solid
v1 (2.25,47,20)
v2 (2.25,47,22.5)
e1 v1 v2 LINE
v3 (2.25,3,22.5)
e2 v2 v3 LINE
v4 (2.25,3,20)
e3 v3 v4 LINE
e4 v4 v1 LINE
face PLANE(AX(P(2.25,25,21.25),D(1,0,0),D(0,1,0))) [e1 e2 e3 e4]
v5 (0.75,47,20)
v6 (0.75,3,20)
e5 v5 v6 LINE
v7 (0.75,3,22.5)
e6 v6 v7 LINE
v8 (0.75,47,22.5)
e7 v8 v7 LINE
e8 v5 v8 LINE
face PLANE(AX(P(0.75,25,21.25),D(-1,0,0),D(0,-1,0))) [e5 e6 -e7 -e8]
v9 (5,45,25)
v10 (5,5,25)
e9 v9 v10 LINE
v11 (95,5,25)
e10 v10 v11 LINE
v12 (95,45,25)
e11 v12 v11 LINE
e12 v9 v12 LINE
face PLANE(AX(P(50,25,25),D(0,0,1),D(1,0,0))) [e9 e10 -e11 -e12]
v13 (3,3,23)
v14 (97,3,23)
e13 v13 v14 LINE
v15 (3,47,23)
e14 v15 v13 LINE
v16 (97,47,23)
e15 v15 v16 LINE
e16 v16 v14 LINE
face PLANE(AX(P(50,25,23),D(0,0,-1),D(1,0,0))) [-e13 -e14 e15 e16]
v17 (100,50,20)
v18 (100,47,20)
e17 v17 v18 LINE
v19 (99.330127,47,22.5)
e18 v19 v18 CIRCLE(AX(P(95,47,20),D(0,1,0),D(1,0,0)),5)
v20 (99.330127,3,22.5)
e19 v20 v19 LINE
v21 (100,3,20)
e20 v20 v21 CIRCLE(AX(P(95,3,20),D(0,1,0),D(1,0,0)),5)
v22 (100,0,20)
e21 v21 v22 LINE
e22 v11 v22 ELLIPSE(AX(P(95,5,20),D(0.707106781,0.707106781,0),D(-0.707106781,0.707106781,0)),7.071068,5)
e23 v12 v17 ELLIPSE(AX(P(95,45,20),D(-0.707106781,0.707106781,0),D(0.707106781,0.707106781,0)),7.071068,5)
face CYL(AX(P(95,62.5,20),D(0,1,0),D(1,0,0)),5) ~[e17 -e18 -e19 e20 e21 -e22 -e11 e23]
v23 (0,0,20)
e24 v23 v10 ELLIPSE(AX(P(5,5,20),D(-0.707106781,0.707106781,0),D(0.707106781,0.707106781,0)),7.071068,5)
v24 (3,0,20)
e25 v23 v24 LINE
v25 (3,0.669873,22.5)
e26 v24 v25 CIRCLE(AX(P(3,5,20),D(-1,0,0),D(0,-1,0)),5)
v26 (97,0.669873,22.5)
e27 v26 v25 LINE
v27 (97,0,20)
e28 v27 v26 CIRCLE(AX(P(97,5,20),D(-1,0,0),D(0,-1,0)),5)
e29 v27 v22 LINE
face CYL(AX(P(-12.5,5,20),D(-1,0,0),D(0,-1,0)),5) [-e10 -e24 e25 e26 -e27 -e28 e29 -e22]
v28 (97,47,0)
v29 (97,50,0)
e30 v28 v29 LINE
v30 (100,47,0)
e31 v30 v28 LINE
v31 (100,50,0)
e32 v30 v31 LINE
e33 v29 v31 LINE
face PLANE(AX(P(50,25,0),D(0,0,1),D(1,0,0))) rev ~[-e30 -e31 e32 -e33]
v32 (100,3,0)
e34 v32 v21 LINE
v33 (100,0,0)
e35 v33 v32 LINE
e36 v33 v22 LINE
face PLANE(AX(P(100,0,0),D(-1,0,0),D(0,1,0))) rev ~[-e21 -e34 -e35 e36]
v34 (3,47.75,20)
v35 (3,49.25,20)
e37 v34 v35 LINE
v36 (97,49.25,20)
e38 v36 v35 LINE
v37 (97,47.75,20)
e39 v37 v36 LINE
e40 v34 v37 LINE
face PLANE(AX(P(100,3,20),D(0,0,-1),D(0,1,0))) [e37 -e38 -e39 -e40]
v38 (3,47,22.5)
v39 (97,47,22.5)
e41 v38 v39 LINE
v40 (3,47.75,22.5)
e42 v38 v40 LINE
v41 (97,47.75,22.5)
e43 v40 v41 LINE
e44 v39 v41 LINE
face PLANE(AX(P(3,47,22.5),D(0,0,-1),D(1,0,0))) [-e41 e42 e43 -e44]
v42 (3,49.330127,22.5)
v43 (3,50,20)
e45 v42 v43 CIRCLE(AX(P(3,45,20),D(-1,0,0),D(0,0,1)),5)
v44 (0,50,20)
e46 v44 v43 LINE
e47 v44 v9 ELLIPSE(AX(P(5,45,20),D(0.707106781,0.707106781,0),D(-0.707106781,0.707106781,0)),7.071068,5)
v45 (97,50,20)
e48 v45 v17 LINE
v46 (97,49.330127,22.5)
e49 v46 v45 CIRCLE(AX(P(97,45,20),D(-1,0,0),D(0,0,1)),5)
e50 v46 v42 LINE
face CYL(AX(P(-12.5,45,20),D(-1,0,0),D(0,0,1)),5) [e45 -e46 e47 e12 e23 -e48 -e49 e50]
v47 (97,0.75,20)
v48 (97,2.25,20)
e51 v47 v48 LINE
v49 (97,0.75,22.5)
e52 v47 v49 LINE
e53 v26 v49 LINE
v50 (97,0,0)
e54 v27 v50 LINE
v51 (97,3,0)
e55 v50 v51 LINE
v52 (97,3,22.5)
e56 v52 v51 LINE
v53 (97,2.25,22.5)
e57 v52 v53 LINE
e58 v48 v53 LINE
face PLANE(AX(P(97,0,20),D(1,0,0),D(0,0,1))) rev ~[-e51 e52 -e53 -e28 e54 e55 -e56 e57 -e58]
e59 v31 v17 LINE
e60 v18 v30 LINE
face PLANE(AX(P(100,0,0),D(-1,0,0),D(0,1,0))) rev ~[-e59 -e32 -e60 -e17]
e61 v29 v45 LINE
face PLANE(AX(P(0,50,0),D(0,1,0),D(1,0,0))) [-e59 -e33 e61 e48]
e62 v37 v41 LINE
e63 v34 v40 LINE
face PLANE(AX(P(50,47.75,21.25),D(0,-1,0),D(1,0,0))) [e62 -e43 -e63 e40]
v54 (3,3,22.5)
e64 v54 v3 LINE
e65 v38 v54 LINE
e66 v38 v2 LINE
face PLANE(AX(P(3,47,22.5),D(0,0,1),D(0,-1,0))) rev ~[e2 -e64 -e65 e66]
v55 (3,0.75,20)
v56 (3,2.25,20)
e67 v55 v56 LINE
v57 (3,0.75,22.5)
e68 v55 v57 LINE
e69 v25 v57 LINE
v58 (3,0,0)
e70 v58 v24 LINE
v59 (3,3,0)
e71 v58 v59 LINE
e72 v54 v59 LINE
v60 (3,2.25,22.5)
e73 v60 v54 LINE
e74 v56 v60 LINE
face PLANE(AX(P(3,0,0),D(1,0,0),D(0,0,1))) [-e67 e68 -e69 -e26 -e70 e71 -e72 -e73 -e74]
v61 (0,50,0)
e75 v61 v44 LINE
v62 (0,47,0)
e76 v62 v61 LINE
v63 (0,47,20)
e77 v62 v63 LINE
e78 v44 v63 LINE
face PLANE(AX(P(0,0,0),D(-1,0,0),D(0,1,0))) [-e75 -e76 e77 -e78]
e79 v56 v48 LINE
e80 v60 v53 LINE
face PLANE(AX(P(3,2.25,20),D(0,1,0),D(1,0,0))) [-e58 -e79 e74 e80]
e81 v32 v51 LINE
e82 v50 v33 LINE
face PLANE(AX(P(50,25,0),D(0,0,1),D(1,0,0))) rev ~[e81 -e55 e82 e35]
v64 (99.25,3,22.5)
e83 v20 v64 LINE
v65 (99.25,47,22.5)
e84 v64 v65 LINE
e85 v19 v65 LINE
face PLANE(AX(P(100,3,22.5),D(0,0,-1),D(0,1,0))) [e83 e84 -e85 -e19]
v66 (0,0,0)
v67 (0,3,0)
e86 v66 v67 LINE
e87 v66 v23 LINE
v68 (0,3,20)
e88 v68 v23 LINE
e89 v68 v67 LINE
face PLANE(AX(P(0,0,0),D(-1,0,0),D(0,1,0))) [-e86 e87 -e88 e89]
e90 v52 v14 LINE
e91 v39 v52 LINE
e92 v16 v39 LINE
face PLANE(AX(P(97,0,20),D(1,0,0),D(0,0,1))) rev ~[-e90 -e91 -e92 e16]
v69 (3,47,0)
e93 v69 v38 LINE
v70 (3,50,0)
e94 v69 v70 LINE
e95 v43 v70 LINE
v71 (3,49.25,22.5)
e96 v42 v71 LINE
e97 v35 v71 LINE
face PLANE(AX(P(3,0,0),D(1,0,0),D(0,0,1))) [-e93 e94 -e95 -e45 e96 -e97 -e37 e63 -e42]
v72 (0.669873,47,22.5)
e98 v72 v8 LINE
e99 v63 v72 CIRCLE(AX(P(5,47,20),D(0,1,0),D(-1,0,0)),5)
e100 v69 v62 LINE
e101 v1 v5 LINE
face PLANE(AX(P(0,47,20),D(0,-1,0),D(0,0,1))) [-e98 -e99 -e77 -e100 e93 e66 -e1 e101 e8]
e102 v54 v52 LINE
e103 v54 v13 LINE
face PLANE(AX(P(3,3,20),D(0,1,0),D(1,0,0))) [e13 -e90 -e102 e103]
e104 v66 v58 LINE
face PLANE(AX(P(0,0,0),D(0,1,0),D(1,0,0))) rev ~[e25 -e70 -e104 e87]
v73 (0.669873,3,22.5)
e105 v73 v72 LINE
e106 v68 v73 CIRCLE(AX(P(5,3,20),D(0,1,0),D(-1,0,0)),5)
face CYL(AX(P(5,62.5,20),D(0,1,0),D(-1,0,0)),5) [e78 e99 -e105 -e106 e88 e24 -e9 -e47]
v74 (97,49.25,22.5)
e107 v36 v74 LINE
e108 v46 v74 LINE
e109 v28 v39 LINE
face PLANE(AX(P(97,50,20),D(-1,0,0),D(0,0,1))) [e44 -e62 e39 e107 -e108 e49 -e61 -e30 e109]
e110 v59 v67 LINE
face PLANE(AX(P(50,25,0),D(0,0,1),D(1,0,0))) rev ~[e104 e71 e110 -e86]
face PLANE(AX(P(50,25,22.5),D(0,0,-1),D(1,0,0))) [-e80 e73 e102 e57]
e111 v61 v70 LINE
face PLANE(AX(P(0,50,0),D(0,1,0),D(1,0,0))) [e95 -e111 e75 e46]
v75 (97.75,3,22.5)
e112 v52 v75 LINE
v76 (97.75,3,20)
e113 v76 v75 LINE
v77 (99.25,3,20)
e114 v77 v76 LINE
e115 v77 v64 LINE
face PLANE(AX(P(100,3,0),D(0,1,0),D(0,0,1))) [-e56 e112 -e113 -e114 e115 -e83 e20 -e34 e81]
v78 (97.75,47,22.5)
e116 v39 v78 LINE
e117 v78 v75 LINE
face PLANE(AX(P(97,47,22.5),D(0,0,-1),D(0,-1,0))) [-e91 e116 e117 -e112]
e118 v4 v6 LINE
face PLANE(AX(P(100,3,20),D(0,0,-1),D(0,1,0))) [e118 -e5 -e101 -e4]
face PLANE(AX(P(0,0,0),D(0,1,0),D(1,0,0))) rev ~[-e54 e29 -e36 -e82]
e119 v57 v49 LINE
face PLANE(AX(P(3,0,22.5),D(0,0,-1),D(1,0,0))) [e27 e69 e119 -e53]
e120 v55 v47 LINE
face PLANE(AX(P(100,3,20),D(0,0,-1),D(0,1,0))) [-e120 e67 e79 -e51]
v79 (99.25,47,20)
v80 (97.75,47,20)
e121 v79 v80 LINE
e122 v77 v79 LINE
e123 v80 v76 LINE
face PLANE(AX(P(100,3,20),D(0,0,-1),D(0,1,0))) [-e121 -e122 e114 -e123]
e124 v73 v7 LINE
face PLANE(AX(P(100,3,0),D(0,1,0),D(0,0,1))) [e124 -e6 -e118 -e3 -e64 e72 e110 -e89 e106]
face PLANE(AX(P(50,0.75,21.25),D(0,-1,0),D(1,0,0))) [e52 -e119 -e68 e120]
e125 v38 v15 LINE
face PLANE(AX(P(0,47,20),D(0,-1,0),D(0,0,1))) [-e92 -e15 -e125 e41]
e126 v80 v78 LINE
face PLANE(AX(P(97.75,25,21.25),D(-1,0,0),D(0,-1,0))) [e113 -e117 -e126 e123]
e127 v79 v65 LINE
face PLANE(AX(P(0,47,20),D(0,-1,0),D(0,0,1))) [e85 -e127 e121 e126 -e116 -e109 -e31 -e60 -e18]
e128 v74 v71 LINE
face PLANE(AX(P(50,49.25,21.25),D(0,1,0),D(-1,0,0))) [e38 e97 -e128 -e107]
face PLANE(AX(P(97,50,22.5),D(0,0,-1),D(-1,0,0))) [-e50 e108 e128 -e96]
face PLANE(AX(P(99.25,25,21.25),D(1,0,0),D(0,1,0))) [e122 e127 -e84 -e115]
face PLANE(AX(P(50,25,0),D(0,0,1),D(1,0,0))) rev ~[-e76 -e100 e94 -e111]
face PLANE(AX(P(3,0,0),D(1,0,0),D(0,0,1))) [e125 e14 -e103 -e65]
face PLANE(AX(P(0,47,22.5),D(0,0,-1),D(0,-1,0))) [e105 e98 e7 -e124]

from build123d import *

# Parameters (mm, degrees)
F0_W         = 100
F0_H         = 50
F1_DEPTH     = 25
F3_W         = 44
F3_H         = 20
F4_DEPTH     = 100.001
F2_W         = 94
F2_H         = 20
F5_DEPTH     = 50.001
F6_W         = 94
F6_H         = 44
F6_H_2       = 0.75
F7_DEPTH     = 2.5
F8_DEPTH     = 3
F2_H_2       = 2.5
F9_DEPTH     = 0.75
F10_W        = 44
F10_H        = 2.5
F11_DEPTH    = 0.75
F13_DEPTH    = 0.75
F14_W        = 44
F14_H        = 2.5
F15_DEPTH    = 0.75
F16_W        = 44
F16_H        = 2.5
F17_DEPTH    = 0.75
F18_W        = 94
F18_H        = 2.5
F19_DEPTH    = 0.75
F20_W        = 94
F20_H        = 2.5
F21_DEPTH    = 0.75
F22_T1_DEPTH = 75
F22_T3_DEPTH = 125


# Not quite as in the source:
# - a fillet or chamfer that OpenCascade refuses, or shapes differently, is made with other operations: its cross-section is extruded or revolved along the edge and cut away or added


with BuildPart() as f1:
    # F0 (on Top) → F1 (new body)
    with BuildSketch(Plane.XY):
        with Locations((50, 25)):
            Rectangle(F0_W, F0_H)
    extrude(amount=F1_DEPTH)

    # F3 (on face) → F4 (cut, through all)
    with BuildSketch(Plane.YZ.offset(100)):
        with Locations((25, 10)):
            Rectangle(F3_W, F3_H)
    extrude(amount=-F4_DEPTH, mode=Mode.SUBTRACT)

    # F2 (on face) → F5 (cut, through all)
    with BuildSketch(Plane.XZ):
        with Locations((50, 10)):
            Rectangle(F2_W, F2_H)
    extrude(amount=-F5_DEPTH, mode=Mode.SUBTRACT)

    # F6 (on face) → F7 (cut)
    with BuildSketch(Plane(origin=(0, 0, 20), x_dir=(1, 0, 0), z_dir=(0, 0, -1))):
        with Locations((50, -25)):
            Rectangle(F6_W, F6_H)
        with Locations((50, -2.625)):
            Rectangle(F6_W, F6_H_2)
    extrude(amount=-F7_DEPTH, mode=Mode.SUBTRACT)

    # F6 (on face) → F8 (cut)
    with BuildSketch(Plane(origin=(0, 0, 20), x_dir=(1, 0, 0), z_dir=(0, 0, -1))):
        with Locations((50, -25)):
            Rectangle(F6_W, F6_H)
    extrude(amount=-F8_DEPTH, mode=Mode.SUBTRACT)

    # F2 (on face) → F9 (cut)
    with BuildSketch(Plane.XZ):
        with Locations((50, 21.25)):
            Rectangle(F2_W, F2_H_2)
    extrude(amount=-F9_DEPTH, mode=Mode.SUBTRACT)

    # F10 (on face) → F11 (cut)
    with BuildSketch(Plane(origin=(0, 0, 0), x_dir=(0, -1, 0), z_dir=(-1, 0, 0))):
        with Locations((-25, 21.25)):
            Rectangle(F10_W, F10_H)
    extrude(amount=-F11_DEPTH, mode=Mode.SUBTRACT)

    # F12 (on face) → F13 (cut)
    with BuildSketch(Plane.YZ.offset(3)):
        Polygon((3, 22.5), (3, 20), (47, 20), (47, 21.5), (47, 22.5), align=None)
    extrude(amount=-F13_DEPTH, mode=Mode.SUBTRACT)

    # F14 (on face) → F15 (cut)
    with BuildSketch(Plane.YZ.offset(100)):
        with Locations((25, 21.25)):
            Rectangle(F14_W, F14_H)
    extrude(amount=-F15_DEPTH, mode=Mode.SUBTRACT)

    # F16 (on face) → F17 (cut)
    with BuildSketch(Plane(origin=(97, 0, 0), x_dir=(0, -1, 0), z_dir=(-1, 0, 0))):
        with Locations((-25, 21.25)):
            Rectangle(F16_W, F16_H)
    extrude(amount=-F17_DEPTH, mode=Mode.SUBTRACT)

    # F18 (on face) → F19 (cut)
    with BuildSketch(Plane(origin=(0, 50, 0), x_dir=(-1, 0, 0), z_dir=(0, 1, 0))):
        with Locations((-50, 21.25)):
            Rectangle(F18_W, F18_H)
    extrude(amount=-F19_DEPTH, mode=Mode.SUBTRACT)

    # F20 (on face) → F21 (cut)
    with BuildSketch(Plane.XZ.offset(-47)):
        with Locations((50, 21.25)):
            Rectangle(F20_W, F20_H)
    extrude(amount=-F21_DEPTH, mode=Mode.SUBTRACT)

    # F22: fillet of radius 5 on 4 edges, made by hand

    # F22_s2 → F22_t1 (cut)
    with BuildSketch(Plane.XZ.offset(-62.5)):
        with BuildLine():
            ThreePointArc((0, 20), (1.4644660941, 23.5355339059), (5, 25))
            Line((5, 25), (0, 25))
            Line((0, 25), (0, 20))
        make_face()
        with BuildLine():
            ThreePointArc((100, 20), (98.5355339059, 23.5355339059), (95, 25))
            Line((95, 25), (100, 25))
            Line((100, 25), (100, 20))
        make_face()
    extrude(amount=F22_T1_DEPTH, mode=Mode.SUBTRACT)

    # F22_s4 → F22_t3 (cut)
    with BuildSketch(Plane.YZ.offset(-12.5)):
        with BuildLine():
            ThreePointArc((0, 20), (1.4644660941, 23.5355339059), (5, 25))
            Line((5, 25), (0, 25))
            Line((0, 25), (0, 20))
        make_face()
        with BuildLine():
            ThreePointArc((45, 25), (48.5355339059, 23.5355339059), (50, 20))
            Line((50, 20), (50, 25))
            Line((50, 25), (45, 25))
        make_face()
    extrude(amount=F22_T3_DEPTH, mode=Mode.SUBTRACT)


solid = f1.part
